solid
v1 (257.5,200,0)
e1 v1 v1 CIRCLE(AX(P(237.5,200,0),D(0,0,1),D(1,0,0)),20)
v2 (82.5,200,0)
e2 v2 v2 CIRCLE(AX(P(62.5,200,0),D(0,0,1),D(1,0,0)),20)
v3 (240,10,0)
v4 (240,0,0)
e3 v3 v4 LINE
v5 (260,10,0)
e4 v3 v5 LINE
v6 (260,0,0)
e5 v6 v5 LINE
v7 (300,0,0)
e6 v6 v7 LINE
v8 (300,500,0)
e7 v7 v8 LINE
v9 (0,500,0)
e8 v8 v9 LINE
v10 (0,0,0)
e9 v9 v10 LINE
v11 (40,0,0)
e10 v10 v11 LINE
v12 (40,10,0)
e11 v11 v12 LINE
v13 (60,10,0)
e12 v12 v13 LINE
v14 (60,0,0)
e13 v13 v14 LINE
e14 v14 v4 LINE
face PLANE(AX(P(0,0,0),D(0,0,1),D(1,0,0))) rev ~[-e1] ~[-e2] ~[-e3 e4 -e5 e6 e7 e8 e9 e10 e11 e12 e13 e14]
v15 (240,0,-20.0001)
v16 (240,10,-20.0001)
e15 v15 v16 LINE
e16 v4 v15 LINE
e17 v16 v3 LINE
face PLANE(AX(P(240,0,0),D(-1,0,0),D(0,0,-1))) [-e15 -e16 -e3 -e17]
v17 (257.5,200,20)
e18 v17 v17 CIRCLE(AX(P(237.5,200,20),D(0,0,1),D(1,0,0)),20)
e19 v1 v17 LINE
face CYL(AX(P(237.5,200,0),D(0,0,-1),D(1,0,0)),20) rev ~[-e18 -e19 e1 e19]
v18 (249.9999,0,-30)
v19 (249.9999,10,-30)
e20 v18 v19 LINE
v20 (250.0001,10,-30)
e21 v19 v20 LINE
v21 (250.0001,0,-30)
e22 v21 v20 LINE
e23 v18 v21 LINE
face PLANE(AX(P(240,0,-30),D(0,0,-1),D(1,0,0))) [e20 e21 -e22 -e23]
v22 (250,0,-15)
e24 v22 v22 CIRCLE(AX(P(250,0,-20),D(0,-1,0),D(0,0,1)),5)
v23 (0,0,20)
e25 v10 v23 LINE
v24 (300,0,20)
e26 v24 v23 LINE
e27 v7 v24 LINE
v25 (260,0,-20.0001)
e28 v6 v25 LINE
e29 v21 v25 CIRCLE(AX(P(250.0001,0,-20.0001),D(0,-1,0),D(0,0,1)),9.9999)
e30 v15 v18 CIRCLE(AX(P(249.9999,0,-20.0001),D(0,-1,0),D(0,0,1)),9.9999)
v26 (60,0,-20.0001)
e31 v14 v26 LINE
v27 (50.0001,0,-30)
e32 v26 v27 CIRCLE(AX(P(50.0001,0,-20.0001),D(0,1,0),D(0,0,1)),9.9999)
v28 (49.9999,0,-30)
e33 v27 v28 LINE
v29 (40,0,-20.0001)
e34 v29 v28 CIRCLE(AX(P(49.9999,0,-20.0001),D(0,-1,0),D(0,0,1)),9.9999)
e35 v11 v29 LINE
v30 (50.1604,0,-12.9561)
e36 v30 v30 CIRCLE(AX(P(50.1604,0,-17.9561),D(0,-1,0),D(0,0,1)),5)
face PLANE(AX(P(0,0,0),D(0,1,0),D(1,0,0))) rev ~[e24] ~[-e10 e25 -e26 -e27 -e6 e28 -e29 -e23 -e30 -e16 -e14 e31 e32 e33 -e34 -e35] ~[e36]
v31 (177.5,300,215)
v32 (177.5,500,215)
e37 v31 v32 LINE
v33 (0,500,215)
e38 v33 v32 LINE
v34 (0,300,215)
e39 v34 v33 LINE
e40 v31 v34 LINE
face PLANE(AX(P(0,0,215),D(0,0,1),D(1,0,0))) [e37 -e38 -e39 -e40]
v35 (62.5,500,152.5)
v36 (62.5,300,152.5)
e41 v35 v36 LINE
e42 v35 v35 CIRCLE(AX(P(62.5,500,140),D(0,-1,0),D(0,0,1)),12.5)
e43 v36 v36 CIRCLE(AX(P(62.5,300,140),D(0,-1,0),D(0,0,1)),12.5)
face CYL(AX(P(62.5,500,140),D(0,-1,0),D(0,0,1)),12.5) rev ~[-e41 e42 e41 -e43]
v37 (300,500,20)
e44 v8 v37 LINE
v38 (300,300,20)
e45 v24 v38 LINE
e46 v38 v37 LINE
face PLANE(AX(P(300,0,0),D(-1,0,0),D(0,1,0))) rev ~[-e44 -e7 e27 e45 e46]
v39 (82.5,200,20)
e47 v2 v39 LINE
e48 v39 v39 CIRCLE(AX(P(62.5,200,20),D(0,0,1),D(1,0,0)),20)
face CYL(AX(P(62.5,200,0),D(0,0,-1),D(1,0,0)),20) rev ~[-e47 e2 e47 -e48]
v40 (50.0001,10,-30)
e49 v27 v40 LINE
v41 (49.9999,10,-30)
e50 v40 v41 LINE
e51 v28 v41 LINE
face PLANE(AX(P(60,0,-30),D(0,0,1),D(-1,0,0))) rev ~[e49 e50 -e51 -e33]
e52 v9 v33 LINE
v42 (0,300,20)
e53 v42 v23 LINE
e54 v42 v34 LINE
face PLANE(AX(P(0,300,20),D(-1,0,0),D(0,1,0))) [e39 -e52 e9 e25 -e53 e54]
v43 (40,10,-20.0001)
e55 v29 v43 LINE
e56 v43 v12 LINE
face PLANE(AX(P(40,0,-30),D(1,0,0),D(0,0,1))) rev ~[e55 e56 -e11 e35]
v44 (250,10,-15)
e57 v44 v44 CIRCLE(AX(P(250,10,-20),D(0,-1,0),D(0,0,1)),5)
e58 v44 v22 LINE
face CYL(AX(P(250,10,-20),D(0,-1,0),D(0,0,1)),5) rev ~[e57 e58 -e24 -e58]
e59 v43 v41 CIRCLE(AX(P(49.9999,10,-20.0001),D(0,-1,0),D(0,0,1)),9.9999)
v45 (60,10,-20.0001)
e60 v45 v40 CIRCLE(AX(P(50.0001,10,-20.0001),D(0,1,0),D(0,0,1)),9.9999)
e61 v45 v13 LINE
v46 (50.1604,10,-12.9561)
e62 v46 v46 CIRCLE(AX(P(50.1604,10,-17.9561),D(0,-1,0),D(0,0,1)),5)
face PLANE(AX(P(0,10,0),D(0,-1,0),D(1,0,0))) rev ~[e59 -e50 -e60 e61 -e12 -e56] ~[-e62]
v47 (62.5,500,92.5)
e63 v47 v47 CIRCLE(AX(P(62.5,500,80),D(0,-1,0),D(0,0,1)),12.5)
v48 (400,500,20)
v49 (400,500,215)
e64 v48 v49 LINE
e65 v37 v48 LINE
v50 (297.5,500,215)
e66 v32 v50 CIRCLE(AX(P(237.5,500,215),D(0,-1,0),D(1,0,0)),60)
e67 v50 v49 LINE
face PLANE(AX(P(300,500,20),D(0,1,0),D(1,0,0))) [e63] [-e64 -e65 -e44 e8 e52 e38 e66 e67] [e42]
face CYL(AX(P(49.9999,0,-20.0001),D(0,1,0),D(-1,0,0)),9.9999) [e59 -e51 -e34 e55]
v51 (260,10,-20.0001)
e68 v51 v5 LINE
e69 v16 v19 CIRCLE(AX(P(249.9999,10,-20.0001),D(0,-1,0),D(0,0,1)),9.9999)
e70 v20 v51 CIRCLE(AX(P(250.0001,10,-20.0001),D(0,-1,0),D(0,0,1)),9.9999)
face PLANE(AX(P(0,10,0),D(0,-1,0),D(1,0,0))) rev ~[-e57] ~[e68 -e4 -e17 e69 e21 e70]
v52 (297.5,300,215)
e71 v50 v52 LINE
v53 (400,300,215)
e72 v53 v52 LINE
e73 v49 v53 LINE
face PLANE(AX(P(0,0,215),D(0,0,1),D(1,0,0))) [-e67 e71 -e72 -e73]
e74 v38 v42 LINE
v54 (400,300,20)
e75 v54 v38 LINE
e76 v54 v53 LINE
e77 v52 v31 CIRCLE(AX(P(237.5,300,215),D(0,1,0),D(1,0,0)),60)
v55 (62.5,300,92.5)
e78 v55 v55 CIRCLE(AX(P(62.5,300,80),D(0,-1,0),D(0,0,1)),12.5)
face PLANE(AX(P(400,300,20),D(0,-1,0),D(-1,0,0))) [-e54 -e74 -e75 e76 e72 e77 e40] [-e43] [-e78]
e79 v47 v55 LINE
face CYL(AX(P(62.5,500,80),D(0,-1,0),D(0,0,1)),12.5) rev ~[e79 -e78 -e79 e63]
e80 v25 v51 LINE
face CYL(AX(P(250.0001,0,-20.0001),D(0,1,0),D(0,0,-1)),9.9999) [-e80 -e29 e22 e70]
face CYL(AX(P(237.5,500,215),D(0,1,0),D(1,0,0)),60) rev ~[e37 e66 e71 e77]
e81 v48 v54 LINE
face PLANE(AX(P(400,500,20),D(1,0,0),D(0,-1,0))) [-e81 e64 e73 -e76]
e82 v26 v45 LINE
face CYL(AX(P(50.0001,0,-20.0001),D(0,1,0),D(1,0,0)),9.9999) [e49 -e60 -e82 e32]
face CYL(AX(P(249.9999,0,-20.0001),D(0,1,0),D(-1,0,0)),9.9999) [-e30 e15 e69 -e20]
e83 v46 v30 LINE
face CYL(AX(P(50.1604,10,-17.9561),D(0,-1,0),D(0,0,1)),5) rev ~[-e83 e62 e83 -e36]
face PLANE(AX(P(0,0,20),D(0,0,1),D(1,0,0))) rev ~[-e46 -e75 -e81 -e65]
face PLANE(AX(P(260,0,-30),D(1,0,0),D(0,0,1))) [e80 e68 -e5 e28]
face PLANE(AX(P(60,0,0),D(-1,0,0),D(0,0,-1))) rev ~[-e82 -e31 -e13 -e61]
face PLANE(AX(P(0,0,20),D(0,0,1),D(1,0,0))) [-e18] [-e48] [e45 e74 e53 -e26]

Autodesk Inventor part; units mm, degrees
ref_plane "YZ Plane" through (0, 0, 0) normal (1, 0, 0) x (0, 1, 0)
ref_plane "XZ Plane" through (0, 0, 0) normal (0, 1, 0) x (-1, 0, 0)
ref_plane "XY Plane" through (0, 0, 0) normal (0, 0, 1) x (1, 0, 0)
sketch "草图1" plane through (0, 0, 0) normal (0, 0, 1) x (1, 0, 0)
  line L0 (0, 0) -> (300, 0)
  line L1 (300, 0) -> (300, 500)
  line L2 (300, 500) -> (0, 500)
  line L3 (0, 500) -> (0, 0)
  line L4 (150, 500) -> (150, 0)
  circle A0 centre (62.5, 200) radius 20
  circle A1 centre (237.5, 200) radius 20
  dimension "d0" = 300
  dimension "d1" = 500
  dimension "d2" = 40
  dimension "d3" = 200
  dimension "d4" = 175
extrude "拉伸1" add sketch "草图1" along normal blind 20
sketch "草图2" plane through (0, 0, 20) normal (0, 0, 1) x (1, 0, 0)
  line L0 (300, 500) -> (0, 500) construction
  line L1 (0, 500) -> (0, 0) construction
  line L2 (0, 0) -> (300, 0) construction
  line L3 (300, 0) -> (300, 500) construction
  circle A0 centre (62.5, 200) radius 20 construction
  circle A1 centre (237.5, 200) radius 20 construction
  line L4 (300, 500) -> (0, 500) projected
  line L5 (0, 500) -> (400, 500)
  line L6 (400, 500) -> (400, 300)
  line L7 (400, 300) -> (0, 300)
  line L8 (0, 300) -> (0, 500)
  dimension "d7" = 400
  dimension "d8" = 200
extrude "拉伸2" add sketch "草图2" along normal blind 195
sketch "草图3" plane through (0, 500, 0) normal (0, 1, 0) x (1, 0, 0)
  line L0 (237.5, 53) -> (237.5, -318) projected
  line L1 (300, 0) -> (0, 0) construction
  line L2 (0, 0) -> (0, -215) construction
  line L3 (400, -215) -> (0, -215) construction
  line L4 (400, -20) -> (400, -215) construction
  line L5 (400, -20) -> (300, -20) construction
  line L6 (300, 0) -> (300, -20) construction
  line L7 (0, -215) -> (400, -215) projected
  circle A0 centre (237.5, -215) radius 60
  dimension "d11" = 120
extrude "拉伸3" cut sketch "草图3" against normal through all
sketch "草图4" plane through (0, 500, 0) normal (0, 1, 0) x (1, 0, 0)
  line L0 (62.5, 43) -> (62.5, -258) projected
  arc A0 (297.5, -215) -> (177.5, -215) centre (237.5, -215) ccw construction
  line L1 (0, -215) -> (177.5, -215) construction
  line L2 (0, -20) -> (0, -215) construction
  line L3 (300, -20) -> (0, -20) construction
  line L4 (300, -20) -> (400, -20) construction
  line L5 (400, -20) -> (400, -215) construction
  line L6 (297.5, -215) -> (400, -215) construction
  point P0 (0, 0)
  point P1 (62.5, -80)
  point P2 (62.5, -140)
  dimension "d14" = 60
  dimension "d15" = 60
hole "孔1" at (62.5, 500, 80) at (62.5, 500, 140) direction (0, -1, 0) diameter 25 end through all
sketch "草图5" plane through (0, 0, 0) normal (0, -1, 0) x (1, 0, 0)
  line L0 (0, 0) -> (300, 0) construction
  line L1 (300, 0) -> (300, 20) construction
  line L2 (0, 20) -> (300, 20) construction
  line L3 (0, 0) -> (0, 20) construction
  line L4 (300, 0) -> (0, 0) projected
  line L5 (150, 0) -> (150, 100)
  line L6 (150, 0) -> (250, 0) construction
  line L7 (300, 20) -> (0, 20) construction
  line L8 (40, 20) -> (60, 20)
  line L9 (60, 20) -> (60, -30)
  line L10 (60, -30) -> (40, -30)
  line L11 (40, -30) -> (40, 20)
  line L12 (260, 20) -> (240, 20)
  line L13 (240, 20) -> (240, -30)
  line L14 (240, -30) -> (260, -30)
  line L15 (260, -30) -> (260, 20)
  dimension "d23" = 100
  dimension "d24" = 90
  dimension "d25" = 300
  dimension "d26" = 20
  dimension "d27" = 50
  dimension "d28" = 180
extrude "拉伸4" add sketch "草图5" against normal blind 10
full round fillet "全圆角1" first side at (60, 3.3333, -20) centre faces at (46.6667, 3.3333, -30) second side at (40, 3.3333, -10)
full round fillet "全圆角2" first side at (260, 3.3333, -20) centre faces at (246.6667, 3.3333, -30) second side at (240, 3.3333, -10)
sketch "草图6" plane through (0, 10, 0) normal (0, 1, 0) x (1, 0, 0)
  arc A0 (260, 20) -> (240, 20) centre (250, 20) ccw projected
  point P0 (0, 0)
  point P1 (50.1604, 17.9561)
hole "孔2" at (50.1604, 10, -17.9561) at (250, 10, -20) direction (0, -1, 0) diameter 10 end through all
properties part number "主体"
